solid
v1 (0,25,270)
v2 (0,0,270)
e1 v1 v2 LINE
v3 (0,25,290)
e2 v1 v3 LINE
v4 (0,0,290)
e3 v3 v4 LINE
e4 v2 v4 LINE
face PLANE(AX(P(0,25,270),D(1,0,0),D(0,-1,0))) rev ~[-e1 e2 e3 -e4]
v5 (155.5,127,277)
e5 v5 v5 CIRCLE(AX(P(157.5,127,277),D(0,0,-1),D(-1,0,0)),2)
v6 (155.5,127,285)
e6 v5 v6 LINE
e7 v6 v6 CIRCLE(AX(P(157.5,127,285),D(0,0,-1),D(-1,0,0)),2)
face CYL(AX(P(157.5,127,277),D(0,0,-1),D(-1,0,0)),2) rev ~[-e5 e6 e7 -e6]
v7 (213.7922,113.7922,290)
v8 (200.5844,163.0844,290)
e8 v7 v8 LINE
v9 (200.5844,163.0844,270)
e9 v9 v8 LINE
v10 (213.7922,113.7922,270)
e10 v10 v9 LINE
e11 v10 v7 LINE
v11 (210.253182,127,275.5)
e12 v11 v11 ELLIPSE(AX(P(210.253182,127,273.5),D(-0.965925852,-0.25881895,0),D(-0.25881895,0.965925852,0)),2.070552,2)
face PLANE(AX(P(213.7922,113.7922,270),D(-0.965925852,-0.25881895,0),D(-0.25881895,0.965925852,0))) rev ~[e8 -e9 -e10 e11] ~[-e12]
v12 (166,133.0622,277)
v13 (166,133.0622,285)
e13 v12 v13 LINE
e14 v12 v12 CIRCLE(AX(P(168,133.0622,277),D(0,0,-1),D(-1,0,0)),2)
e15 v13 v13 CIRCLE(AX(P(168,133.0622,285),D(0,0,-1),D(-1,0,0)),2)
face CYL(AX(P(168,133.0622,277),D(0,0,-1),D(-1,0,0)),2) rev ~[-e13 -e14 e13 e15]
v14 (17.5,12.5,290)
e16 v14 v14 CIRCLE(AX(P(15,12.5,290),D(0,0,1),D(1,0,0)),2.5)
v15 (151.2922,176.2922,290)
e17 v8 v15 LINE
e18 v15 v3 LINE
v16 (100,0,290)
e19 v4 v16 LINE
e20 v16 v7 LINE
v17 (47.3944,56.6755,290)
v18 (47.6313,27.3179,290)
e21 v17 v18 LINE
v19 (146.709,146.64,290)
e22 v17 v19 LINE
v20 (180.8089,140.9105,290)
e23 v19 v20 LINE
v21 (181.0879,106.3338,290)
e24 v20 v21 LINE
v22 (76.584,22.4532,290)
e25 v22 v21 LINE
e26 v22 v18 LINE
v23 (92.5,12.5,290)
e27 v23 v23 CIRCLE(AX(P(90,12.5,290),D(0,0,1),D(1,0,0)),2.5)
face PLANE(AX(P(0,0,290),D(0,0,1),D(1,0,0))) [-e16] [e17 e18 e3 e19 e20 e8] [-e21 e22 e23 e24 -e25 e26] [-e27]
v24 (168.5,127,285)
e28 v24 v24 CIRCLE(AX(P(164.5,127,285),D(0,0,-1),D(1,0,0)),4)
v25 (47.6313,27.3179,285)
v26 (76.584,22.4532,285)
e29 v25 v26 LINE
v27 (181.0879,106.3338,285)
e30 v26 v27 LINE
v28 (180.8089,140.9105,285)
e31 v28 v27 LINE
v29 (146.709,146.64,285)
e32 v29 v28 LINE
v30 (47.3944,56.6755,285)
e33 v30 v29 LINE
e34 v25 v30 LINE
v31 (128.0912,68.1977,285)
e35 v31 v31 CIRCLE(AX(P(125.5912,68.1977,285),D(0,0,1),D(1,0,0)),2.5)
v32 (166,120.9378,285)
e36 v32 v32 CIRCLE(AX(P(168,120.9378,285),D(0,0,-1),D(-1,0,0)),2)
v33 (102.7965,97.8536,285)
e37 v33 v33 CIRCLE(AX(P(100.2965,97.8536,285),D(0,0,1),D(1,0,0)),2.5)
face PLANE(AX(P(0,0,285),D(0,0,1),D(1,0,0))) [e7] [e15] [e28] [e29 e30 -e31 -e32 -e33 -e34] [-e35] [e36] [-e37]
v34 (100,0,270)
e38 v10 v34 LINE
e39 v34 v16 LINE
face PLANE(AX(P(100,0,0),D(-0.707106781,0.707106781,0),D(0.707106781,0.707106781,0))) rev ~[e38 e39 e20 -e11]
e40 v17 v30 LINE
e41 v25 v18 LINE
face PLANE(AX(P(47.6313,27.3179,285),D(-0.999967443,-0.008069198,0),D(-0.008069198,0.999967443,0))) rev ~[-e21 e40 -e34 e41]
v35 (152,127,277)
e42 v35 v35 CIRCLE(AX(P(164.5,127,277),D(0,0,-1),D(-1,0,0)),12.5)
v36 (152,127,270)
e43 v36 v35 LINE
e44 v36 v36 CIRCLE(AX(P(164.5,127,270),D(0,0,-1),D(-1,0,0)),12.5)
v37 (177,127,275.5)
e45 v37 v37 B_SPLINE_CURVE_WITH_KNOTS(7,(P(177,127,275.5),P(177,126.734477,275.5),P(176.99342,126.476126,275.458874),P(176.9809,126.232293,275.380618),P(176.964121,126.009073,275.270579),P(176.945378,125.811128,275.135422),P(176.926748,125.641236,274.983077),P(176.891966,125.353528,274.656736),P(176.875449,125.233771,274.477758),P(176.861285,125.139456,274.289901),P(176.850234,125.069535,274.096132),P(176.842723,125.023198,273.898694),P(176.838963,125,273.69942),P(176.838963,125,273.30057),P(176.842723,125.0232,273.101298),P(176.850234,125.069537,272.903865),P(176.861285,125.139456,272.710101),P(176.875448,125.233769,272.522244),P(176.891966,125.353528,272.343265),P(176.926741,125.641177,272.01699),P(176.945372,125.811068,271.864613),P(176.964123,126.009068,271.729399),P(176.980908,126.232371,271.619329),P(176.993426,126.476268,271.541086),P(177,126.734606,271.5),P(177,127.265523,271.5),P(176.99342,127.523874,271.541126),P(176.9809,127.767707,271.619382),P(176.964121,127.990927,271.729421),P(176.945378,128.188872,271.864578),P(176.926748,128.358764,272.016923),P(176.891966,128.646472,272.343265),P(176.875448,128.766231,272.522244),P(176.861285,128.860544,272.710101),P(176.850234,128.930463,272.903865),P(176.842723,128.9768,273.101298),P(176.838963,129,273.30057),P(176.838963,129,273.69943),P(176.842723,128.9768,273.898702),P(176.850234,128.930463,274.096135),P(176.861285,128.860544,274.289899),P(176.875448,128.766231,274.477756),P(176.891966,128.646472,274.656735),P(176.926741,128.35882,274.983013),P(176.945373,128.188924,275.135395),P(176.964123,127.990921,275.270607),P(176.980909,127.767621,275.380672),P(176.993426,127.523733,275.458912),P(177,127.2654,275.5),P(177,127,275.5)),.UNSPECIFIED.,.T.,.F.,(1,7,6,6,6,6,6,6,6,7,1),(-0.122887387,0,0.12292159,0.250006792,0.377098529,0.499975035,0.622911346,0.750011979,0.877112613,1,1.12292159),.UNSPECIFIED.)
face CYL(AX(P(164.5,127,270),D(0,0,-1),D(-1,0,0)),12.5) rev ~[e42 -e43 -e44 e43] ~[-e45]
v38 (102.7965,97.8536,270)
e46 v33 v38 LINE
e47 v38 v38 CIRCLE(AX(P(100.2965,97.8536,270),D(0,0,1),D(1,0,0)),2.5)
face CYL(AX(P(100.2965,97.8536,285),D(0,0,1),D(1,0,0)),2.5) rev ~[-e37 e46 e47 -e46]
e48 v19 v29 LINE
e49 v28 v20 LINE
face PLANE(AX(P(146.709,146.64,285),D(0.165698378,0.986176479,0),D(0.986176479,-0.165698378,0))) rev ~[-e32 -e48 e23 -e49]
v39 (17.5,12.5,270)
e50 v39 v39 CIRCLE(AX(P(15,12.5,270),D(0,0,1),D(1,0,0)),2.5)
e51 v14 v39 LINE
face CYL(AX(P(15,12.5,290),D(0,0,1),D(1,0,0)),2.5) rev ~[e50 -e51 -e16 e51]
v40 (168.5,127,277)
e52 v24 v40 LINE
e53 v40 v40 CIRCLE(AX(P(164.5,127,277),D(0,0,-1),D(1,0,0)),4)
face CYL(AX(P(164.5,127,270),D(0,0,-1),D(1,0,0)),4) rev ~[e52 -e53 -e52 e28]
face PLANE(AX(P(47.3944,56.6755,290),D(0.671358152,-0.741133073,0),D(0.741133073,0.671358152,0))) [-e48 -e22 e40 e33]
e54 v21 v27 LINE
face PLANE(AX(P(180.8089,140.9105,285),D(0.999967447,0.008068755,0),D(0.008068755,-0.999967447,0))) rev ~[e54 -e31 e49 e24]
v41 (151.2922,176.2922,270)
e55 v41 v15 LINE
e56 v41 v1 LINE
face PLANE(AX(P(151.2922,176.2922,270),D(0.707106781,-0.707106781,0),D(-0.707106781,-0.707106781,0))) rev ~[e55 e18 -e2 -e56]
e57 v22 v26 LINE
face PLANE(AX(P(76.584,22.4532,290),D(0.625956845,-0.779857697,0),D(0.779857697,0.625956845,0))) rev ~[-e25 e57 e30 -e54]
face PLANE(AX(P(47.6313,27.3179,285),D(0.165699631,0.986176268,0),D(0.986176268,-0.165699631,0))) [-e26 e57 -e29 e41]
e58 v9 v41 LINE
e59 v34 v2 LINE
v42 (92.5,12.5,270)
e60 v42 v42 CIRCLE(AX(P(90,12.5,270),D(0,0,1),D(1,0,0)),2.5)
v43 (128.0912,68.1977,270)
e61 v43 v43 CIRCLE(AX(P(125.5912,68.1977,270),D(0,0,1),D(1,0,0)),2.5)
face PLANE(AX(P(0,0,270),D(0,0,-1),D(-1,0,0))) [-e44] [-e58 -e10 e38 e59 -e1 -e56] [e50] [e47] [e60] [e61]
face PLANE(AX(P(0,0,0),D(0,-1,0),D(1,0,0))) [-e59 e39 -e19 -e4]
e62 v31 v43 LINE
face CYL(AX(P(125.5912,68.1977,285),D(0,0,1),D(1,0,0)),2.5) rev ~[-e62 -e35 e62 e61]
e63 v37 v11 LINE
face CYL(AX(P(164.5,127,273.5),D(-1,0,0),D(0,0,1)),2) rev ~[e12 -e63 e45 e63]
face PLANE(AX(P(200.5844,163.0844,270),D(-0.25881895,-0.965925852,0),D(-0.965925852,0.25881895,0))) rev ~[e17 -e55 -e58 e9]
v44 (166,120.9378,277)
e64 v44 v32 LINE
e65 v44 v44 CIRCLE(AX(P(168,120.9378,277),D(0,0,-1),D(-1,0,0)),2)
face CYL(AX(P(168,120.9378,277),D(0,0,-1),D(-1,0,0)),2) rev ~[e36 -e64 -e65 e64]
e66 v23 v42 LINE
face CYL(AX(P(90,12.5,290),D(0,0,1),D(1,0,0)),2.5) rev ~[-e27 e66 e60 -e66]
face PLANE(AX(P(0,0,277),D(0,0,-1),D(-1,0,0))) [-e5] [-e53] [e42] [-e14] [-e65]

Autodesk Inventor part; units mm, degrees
ref_plane "XZ Plane" through (0, 0, 0) normal (0, 1, 0) x (-1, 0, 0)
ref_plane "XY Plane" through (0, 0, 0) normal (0, 0, 1) x (1, 0, 0)
sketch "Sketch1" plane through (0, 0, 0) normal (0, 0, 1) x (1, 0, 0)
  line L0 (0, 0) -> (100, 0)
  line L1 (100, 0) -> (100, 25)
  line L2 (100, 25) -> (0, 25)
  line L3 (0, 25) -> (0, 0)
  line L4 (0, 25) -> (115.2078, 140.2078)
  line L5 (100, 0) -> (177.7078, 77.7078)
  line L6 (151.2922, 176.2922) -> (200.5844, 163.0844)
  line L7 (200.5844, 163.0844) -> (213.7922, 113.7922)
  line L8 (213.7922, 113.7922) -> (177.7078, 77.7078)
  line L9 (177.7078, 77.7078) -> (128.4156, 90.9156)
  line L10 (128.4156, 90.9156) -> (115.2078, 140.2078)
  line L11 (115.2078, 140.2078) -> (151.2922, 176.2922)
  circle A0 centre (164.5, 127) radius 4
  dimension "d0" = 100
  dimension "d1" = 25
  dimension "d6" = 8
  dimension "d8" = 45
  dimension "d15" = 127
extrude "Extrusion1" add sketch "Sketch1" along normal blind 20
sketch "Sketch2" plane through (0, 0, 20) normal (0, 0, 1) x (1, 0, 0)
  line L0 (0, 25) -> (0, 0) projected
  line L1 (0, 0) -> (100, 0) projected
  line L2 (0, 25) -> (100, 25)
  line L3 (100, 25) -> (100, 0)
  line L4 (100, 0) -> (0, 0)
  line L5 (0, 0) -> (0, 25)
  line L6 (100, 25) -> (125, 25)
  line L7 (100, 0) -> (213.7922, 113.7922) projected
  line L8 (100, 0) -> (125, 25)
extrude "Extrusion2" add sketch "Sketch2" along normal blind 250
sketch "Sketch4" plane through (0, 0, 270) normal (0, 0, 1) x (1, 0, 0)
  line L0 (0, 25) -> (125, 25) projected
  line L1 (125, 25) -> (213.7922, 113.7922) projected
  line L2 (213.7922, 113.7922) -> (200.5844, 163.0844) projected
  line L3 (200.5844, 163.0844) -> (151.2922, 176.2922) projected
  line L4 (151.2922, 176.2922) -> (0, 25) projected
  circle A0 centre (164.5, 127) radius 4 projected
  line L5 (100, 0) -> (125, 25) projected
  line L6 (125, 25) -> (0, 25) projected
  line L7 (0, 25) -> (0, 0) projected
  line L8 (0, 0) -> (100, 0) projected
extrude "Extrusion3" add sketch "Sketch4" along normal blind 20
sketch "Sketch5" plane through (0, 0, 0) normal (0, -1, 0) x (1, 0, 0)
  line L0 (0, 0) -> (100, 0) projected
  line L1 (100, 0) -> (100, 290) projected
  line L2 (0, 290) -> (100, 290) projected
  line L3 (0, 0) -> (0, 290) projected
  line L4 (0, 0) -> (-125.5737, 72.5)
  line L5 (-125.5737, 72.5) -> (-125.5737, 217.5)
  line L6 (-125.5737, 217.5) -> (0, 290)
  line L7 (0, 290) -> (125.5737, 217.5)
  line L8 (125.5737, 217.5) -> (125.5737, 72.5)
  line L9 (125.5737, 72.5) -> (0, 0)
  point P0 (0, 145)
extrude "Extrusion4" add sketch "Sketch5" against normal blind 25 contours L4 L5 L6 L3
sketch "Sketch6" plane through (0, 25, 20) normal (0, 1, 0) x (1, 0, 0)
  line L0 (100, 20) -> (100, -270) projected
  circle A0 centre (-24.528, -125) radius 3
  circle A1 centre (-31.528, -125) radius 1.5
  circle A2 centre (-21.028, -131.0622) radius 1.5
  circle A3 centre (-21.028, -118.9378) radius 1.5
  point P0 (0, 20)
  point P1 (100, -125)
  dimension "d18" = 6
  dimension "d19" = 124.528
  dimension "d20" = 3
  dimension "d21" = 7
  dimension "d24" = 360
extrude "Extrusion5" cut sketch "Sketch6" against normal through all
sketch "Sketch7" plane through (100, 0, 0) normal (0, -1, 0) x (1, 0, 0)
  circle A0 centre (-124.528, 145) radius 3 projected
  circle A1 centre (-124.528, 145) radius 12
  point P0 (-100, 0)
  dimension "d28" = 24
extrude "Extrusion6" cut sketch "Sketch7" against normal blind 5
sketch "Sketch8" plane through (0, 0, 270) normal (0, 0, -1) x (-1, 0, 0)
  circle A0 centre (-164.5, 127) radius 4 projected
  circle A1 centre (-164.5, 127) radius 12.5
  point P0 (0, 0)
  dimension "d31" = 25
extrude "Extrusion7" cut sketch "Sketch8" against normal blind 7
sketch "Sketch10" plane through (164.5, 127, 277) normal (0, 0, -1) x (-1, 0, 0)
  circle A0 centre (7, 0) radius 2
  circle A1 centre (0, 0) radius 4 projected
  circle A2 centre (-3.5, 6.0622) radius 2
  circle A3 centre (-3.5, -6.0622) radius 2
  point P0 (164.5, -127)
  dimension "d34" = 4
  dimension "d37" = 360
  dimension "d39" = 7
extrude "Extrusion8" cut sketch "Sketch10" against normal through all
sketch "Sketch11" plane through (0, 0, 290) normal (0, 0, 1) x (1, 0, 0)
  circle A0 centre (168, 133.0622) radius 2 projected
  circle A1 centre (164.5, 127) radius 4 projected
  circle A2 centre (168, 133.0622) radius 4
  circle A3 centre (157.5, 127) radius 4
  circle A4 centre (168, 120.9378) radius 4
  point P0 (0, 0)
  dimension "d42" = 8
  dimension "d45" = 360
extrude "Extrusion9" cut sketch "Sketch11" against normal blind 3 contours A0 | A1 A4 A3 A2 | A2 A1 | A1 A2 | A4 A1 | A1 A4 | A3 A1 | A1 A3
ref_plane "Work Plane1" through (164.5, 127, 270) normal (1, 0, 0) x (0, 0, 1)
sketch "Sketch12" plane through (164.5, 127, 270) normal (1, 0, 0) x (0, 0, 1)
  line L0 (17, -1.9365) -> (17, 1.9365) projected
  line L1 (17, 1.9365) -> (20, 1.9365) projected
  line L2 (20, 3.9993) -> (20, 1.9365) projected
  line L3 (20, 3.9993) -> (17, 3.9993) projected
  line L4 (17, 3.9993) -> (17, 2.0628) projected
  line L5 (17, 2.0628) -> (20, 2.0628) projected
  line L6 (20, -2.0628) -> (20, 2.0628) projected
  line L7 (20, -2.0628) -> (17, -2.0628) projected
  line L8 (17, -2.0628) -> (17, -3.9993) projected
  line L9 (17, -3.9993) -> (20, -3.9993) projected
  line L10 (20, -1.9365) -> (20, -3.9993) projected
  line L11 (20, -1.9365) -> (17, -1.9365) projected
  line L12 (7, 4) -> (7, -4) projected
  line L13 (7, -12.5) -> (7, 12.5) projected
  line L14 (0, -12.5) -> (0, 12.5) projected
  circle A0 centre (3.5, 0) radius 2
  line L15 (0, -12.5) -> (7, -12.5) projected
  point P0 (-270, 127)
  point P1 (7, 0)
  point P2 (3.5, -12.5)
  dimension "d50" = 4
extrude "Extrusion10" cut sketch "Sketch12" along normal through all contours A0
sketch "Sketch13" plane through (0, 0, 270) normal (0, 0, -1) x (-1, 0, 0)
  circle A0 centre (-164.5, 127) radius 4 projected
  line L0 (0, 0) -> (-100, 0) projected
  line L1 (0, 25) -> (0, 0) projected
  line L2 (-151.2922, 176.2922) -> (0, 25) projected
  line L3 (-200.5844, 163.0844) -> (-151.2922, 176.2922) projected
  line L4 (-213.7922, 113.7922) -> (-200.5844, 163.0844) projected
  line L5 (-100, 0) -> (-213.7922, 113.7922) projected
  line L6 (125.5737, 0) -> (0, 0) projected
  line L7 (125.5737, 0) -> (125.5737, 25) projected
  line L8 (0, 25) -> (125.5737, 25) projected
  line L9 (0, 25) -> (0, 0) projected
extrude "Extrusion11" cut sketch "Sketch13" along normal through all
sketch "Sketch14" plane through (0, 0, 270) normal (0, 0, -1) x (-1, 0, 0)
  line L0 (-151.2922, 176.2922) -> (0, 25) projected
  line L1 (0, 25) -> (0, 0) projected
  line L2 (0, 25) -> (0, 0)
  line L3 (0, 25) -> (34.641, 25) projected
  line L4 (34.641, 25) -> (34.641, 0) projected
  line L5 (34.641, 25) -> (0, 25) projected
  line L6 (0, 25) -> (34.641, 25)
  line L7 (34.641, 0) -> (-100, 0) projected
  line L8 (34.641, 25) -> (34.641, 0)
  line L9 (34.641, 0) -> (0, 0)
extrude "Extrusion12" cut sketch "Sketch14" against normal through all
sketch "Sketch15" plane through (0, 0, 290) normal (0, 0, 1) x (1, 0, 0)
  line L0 (15, 12.5) -> (90, 12.5) construction
  line L1 (0, 0) -> (100, 0) projected
  circle A0 centre (15, 12.5) radius 2.5
  circle A1 centre (90, 12.5) radius 2.5
  dimension "d57" = 12.5
  dimension "d58" = 10
  dimension "d59" = 75
  dimension "d60" = 5
  dimension "d61" = 5
extrude "Extrusion13" cut sketch "Sketch15" against normal through all
sketch "Sketch16" plane through (0, 0, 290) normal (0, 0, 1) x (1, 0, 0)
  arc A0 (167.9271, 124.9372) -> (167.9271, 129.0628) centre (164.5, 127) ccw projected
  circle A1 centre (164.5, 127) radius 26.5
  circle A2 centre (62.5, 40) radius 22.5
  line L0 (0, 25) -> (125, 25) construction
  line L1 (100, 0) -> (213.7922, 113.7922) projected
  line L2 (47.3944, 56.6755) -> (146.709, 146.64)
  line L3 (76.584, 22.4532) -> (181.0879, 106.3338)
  point P0 (0, 0)
  point P1 (62.5, 25)
  dimension "d64" = 53
  dimension "d65" = 45
  dimension "d67" = 15
extrude "Extrusion14" cut sketch "Sketch16" against normal blind 5
sketch "Sketch17" plane through (0, 0, 285) normal (0, 0, 1) x (1, 0, 0)
  line L0 (47.3944, 56.6755) -> (146.709, 146.64) construction
  line L1 (181.0879, 106.3338) -> (76.584, 22.4532) construction
  line L2 (97.0517, 101.6578) -> (128.8359, 64.3935) construction
  circle A0 centre (100.2965, 97.8536) radius 2.5
  circle A1 centre (125.5912, 68.1977) radius 2.5
  point P0 (0, 0)
  dimension "d70" = 5
  dimension "d71" = 5
  dimension "d72" = 5
  dimension "d73" = 5
extrude "Extrusion15" cut sketch "Sketch17" against normal through all
sketch "Sketch18" plane through (0, 0, 285) normal (0, 0, 1) x (1, 0, 0)
  arc A0 (181.0879, 106.3338) -> (146.709, 146.64) centre (164.5, 127) ccw projected
  line L0 (146.709, 146.64) -> (180.8089, 140.9105)
  line L1 (180.8089, 140.9105) -> (181.0879, 106.3338)
  arc A1 (47.3944, 56.6755) -> (76.584, 22.4532) centre (62.5, 40) ccw projected
  line L2 (62.5, 40) -> (180.8089, 140.9105)
  point P0 (0, 0)
  dimension "d76" = 100
extrude "Extrusion16" add sketch "Sketch18" along normal blind 5
sketch "Sketch19" plane through (0, 0, 290) normal (0, 0, 1) x (1, 0, 0)
  arc A0 (47.3944, 56.6755) -> (76.584, 22.4532) centre (62.5, 40) ccw projected
  line L0 (47.3944, 56.6755) -> (146.709, 146.64) projected
  line L1 (47.3944, 56.6755) -> (76.584, 22.4532)
  point P0 (0, 0)
  dimension "d0" = 100
extrude "Extrusion17" add sketch "Sketch19" against normal blind 5
sketch "Sketch20" plane through (0, 0, 285) normal (0, 0, 1) x (1, 0, 0)
  line L0 (47.3944, 56.6755) -> (76.584, 22.4532) projected
  circle A0 centre (164.5, 127) radius 4 projected
  circle A1 centre (164.5, 127) radius 4 projected
  line L1 (164.5, 127) -> (47.6313, 27.3179)
  line L2 (47.6313, 27.3179) -> (47.3944, 56.6755)
  line L3 (47.6313, 27.3179) -> (76.584, 22.4532)
  point P0 (0, 0)
  point P1 (61.9892, 39.5643)
  dimension "d81" = 100
extrude "Extrusion18" cut sketch "Sketch20" along normal through all contours L0 L1 L2 | L0 L3 L1
properties part number "HA02" material "ABS Plastic"
